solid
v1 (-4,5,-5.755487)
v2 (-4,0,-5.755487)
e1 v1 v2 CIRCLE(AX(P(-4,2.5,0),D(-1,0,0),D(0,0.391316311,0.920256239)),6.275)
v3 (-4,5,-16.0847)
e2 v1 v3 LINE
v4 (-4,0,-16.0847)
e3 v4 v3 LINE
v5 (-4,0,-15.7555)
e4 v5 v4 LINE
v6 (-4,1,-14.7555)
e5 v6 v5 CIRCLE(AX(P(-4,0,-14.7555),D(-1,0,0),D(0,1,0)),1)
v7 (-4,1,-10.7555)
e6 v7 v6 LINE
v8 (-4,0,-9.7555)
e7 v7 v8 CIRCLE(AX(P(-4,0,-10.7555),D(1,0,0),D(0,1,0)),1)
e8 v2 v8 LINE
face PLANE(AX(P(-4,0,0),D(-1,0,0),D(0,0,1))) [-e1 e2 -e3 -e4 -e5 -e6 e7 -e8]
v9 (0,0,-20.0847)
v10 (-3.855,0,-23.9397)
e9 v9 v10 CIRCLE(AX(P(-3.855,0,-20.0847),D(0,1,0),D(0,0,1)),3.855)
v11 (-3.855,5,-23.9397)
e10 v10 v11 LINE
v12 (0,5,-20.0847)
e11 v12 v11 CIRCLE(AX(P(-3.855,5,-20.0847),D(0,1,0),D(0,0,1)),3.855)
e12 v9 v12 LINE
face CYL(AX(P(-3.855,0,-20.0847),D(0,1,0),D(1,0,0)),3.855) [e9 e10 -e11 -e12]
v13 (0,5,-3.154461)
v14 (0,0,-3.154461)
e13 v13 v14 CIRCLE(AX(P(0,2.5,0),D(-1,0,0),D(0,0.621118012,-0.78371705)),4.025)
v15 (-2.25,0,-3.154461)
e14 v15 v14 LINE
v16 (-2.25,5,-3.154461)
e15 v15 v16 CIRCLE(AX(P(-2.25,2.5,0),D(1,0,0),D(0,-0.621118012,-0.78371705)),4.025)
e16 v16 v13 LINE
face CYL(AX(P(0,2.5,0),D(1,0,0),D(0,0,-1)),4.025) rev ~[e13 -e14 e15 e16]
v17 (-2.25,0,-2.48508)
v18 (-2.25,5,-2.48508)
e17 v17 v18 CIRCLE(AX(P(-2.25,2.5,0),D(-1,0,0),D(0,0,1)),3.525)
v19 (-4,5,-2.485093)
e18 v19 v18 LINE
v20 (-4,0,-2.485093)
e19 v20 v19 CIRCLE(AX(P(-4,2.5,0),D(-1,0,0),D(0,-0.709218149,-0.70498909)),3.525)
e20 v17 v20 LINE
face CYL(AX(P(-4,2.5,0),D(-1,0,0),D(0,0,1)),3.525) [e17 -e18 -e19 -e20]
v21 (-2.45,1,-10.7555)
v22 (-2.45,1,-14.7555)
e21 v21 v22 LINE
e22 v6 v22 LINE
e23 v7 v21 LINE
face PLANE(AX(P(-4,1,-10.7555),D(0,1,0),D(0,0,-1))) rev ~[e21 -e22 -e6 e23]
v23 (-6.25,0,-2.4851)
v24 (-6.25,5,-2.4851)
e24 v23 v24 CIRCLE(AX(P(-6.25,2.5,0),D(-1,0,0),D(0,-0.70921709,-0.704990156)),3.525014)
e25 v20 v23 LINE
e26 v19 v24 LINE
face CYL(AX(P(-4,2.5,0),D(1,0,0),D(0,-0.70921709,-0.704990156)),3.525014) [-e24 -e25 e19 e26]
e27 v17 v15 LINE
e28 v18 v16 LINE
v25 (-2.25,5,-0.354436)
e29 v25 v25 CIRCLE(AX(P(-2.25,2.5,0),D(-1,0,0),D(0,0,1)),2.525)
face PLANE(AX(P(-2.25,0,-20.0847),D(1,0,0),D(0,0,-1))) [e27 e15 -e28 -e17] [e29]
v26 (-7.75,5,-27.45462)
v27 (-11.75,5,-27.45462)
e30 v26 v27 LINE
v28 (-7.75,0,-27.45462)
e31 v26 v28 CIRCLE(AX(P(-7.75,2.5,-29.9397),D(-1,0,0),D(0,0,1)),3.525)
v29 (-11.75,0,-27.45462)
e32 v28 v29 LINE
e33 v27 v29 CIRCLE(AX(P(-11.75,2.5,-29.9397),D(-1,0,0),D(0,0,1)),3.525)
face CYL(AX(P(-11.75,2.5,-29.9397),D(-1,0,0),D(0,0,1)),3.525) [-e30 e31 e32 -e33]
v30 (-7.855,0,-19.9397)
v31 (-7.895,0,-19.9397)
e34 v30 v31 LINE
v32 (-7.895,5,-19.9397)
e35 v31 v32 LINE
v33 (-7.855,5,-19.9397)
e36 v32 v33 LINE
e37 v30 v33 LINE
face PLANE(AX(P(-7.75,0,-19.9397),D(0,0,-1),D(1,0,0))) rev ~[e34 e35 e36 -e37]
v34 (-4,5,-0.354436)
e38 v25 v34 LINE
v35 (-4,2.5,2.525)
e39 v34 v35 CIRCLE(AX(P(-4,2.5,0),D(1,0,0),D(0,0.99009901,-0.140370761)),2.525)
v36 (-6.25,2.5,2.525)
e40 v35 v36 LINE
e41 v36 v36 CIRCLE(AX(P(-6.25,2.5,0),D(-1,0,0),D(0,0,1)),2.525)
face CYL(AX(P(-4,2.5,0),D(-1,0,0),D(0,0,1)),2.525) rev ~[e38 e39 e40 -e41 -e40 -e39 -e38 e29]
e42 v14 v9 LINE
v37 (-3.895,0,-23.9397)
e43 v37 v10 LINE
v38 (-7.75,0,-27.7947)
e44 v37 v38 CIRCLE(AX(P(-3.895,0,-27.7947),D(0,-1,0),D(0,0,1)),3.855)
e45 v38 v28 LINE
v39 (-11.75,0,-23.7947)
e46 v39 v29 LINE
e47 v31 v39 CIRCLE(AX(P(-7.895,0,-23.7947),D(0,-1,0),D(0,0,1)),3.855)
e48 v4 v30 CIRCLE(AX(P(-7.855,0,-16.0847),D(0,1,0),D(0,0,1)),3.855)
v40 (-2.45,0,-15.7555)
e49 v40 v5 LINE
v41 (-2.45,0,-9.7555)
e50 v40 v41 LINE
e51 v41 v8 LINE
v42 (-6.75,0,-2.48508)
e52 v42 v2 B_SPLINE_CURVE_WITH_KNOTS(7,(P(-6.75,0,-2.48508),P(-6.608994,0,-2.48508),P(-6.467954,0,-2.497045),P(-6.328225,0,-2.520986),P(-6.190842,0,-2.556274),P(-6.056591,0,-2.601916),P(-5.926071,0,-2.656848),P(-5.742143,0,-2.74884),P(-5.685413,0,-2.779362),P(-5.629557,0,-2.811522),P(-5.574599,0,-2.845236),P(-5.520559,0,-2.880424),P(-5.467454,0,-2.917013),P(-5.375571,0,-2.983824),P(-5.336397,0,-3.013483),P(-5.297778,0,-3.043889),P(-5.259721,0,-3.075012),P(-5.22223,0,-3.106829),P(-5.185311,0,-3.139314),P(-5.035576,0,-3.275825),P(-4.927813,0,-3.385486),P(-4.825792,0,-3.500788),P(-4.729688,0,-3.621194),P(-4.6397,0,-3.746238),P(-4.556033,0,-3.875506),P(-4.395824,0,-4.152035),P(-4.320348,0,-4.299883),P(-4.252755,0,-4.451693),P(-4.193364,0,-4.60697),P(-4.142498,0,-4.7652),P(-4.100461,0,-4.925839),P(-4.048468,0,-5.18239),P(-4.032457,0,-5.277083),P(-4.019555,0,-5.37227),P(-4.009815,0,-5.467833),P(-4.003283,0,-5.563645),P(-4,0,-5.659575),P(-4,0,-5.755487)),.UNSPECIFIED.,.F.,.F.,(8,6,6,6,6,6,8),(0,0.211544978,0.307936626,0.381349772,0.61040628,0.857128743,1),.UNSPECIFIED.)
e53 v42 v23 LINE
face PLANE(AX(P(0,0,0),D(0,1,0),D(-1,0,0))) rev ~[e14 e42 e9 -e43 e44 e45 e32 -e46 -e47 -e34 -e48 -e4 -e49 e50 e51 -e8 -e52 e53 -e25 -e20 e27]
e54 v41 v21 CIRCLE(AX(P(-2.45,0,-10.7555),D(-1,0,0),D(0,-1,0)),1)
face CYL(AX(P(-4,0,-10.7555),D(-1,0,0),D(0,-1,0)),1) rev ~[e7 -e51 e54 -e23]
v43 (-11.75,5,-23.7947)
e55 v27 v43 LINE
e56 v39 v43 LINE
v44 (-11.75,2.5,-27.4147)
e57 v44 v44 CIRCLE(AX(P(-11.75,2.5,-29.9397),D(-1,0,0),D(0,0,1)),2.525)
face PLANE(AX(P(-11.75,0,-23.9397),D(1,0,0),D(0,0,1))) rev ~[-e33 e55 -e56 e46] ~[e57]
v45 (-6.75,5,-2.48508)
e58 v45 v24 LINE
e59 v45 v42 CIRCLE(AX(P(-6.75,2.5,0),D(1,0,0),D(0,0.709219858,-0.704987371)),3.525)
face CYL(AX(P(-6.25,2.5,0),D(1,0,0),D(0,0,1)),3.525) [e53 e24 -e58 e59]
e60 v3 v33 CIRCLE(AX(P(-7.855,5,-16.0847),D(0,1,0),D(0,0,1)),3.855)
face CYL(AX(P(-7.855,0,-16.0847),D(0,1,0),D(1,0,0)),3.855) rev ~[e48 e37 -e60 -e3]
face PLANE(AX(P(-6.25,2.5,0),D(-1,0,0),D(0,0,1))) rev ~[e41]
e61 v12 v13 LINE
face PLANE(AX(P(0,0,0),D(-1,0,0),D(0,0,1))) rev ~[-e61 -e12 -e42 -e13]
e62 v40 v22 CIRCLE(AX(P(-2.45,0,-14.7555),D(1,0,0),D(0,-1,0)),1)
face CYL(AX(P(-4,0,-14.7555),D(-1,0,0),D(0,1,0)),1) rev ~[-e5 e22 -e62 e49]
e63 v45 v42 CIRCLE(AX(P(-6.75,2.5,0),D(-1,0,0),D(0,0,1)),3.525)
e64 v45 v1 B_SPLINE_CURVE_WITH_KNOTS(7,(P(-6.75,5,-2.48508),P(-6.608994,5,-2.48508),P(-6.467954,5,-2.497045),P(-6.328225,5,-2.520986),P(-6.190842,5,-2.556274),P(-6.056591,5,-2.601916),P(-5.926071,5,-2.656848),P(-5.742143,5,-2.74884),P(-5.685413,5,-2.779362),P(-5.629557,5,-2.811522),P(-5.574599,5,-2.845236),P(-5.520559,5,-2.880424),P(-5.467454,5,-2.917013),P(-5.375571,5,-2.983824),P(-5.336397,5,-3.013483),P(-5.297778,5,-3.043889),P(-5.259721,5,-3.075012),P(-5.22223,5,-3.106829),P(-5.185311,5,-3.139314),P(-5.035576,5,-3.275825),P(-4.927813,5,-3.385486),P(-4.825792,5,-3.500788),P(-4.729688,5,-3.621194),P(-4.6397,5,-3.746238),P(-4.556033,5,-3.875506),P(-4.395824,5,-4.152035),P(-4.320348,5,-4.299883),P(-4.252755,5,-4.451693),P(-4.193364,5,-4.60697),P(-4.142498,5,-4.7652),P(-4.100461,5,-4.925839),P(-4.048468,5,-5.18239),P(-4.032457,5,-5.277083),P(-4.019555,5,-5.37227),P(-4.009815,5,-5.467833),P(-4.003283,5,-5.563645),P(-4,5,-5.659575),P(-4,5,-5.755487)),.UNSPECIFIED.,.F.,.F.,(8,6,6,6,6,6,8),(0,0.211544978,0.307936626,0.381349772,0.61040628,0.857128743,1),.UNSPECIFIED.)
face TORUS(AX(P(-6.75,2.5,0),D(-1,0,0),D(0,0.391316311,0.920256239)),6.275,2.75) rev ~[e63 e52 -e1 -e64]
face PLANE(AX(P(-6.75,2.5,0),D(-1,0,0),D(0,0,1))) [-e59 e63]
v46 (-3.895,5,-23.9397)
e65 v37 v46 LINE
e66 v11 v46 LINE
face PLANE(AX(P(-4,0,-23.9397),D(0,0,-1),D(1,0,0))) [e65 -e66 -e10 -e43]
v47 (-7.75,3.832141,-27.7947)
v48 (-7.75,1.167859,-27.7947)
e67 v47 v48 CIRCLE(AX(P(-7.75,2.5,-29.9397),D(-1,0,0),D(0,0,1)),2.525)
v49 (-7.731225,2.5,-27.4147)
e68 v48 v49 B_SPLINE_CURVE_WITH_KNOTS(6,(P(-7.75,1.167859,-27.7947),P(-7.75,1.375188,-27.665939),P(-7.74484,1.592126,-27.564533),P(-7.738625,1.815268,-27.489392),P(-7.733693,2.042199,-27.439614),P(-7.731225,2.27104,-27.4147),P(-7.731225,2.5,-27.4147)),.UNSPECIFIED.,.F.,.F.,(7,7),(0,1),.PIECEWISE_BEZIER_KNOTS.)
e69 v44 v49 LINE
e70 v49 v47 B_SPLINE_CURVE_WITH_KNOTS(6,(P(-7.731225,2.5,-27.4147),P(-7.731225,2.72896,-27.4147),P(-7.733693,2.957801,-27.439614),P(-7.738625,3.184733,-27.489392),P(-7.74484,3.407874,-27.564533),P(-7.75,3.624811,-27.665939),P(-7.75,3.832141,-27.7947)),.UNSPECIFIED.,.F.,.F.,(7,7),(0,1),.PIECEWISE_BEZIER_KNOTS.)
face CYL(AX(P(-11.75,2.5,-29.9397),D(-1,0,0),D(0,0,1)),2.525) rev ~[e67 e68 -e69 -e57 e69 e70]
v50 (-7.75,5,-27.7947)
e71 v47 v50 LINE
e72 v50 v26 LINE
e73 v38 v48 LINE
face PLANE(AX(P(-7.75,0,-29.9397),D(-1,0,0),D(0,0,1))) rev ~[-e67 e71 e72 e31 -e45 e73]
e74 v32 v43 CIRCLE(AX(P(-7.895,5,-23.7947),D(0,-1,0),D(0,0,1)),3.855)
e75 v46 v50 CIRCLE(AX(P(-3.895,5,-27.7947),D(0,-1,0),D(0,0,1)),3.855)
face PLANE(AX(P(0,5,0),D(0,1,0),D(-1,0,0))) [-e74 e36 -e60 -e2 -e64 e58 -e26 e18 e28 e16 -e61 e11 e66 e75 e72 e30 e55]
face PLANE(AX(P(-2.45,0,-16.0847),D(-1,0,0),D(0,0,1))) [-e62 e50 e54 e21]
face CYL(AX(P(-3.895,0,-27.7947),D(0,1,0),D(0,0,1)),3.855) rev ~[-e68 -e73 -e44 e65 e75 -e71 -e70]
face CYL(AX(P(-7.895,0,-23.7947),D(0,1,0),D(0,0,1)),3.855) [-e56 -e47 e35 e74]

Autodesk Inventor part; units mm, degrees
ref_plane "YZ Plane" through (0, 0, 0) normal (1, 0, 0) x (0, 1, 0)
ref_plane "XZ Plane" through (0, 0, 0) normal (0, 1, 0) x (-1, 0, 0)
ref_plane "XY Plane" through (0, 0, 0) normal (0, 0, 1) x (1, 0, 0)
sketch "Эскиз1" plane through (0, 0, 0) normal (0, 1, 0) x (-1, 0, 0)
  line L0 (0, 0) -> (4, 0)
  line L1 (4, 0) -> (4, -23.9397)
  line L2 (4, -23.9397) -> (0, -23.9397)
  line L3 (0, -23.9397) -> (0, 0)
  line L4 (0, -23.9397) -> (11.75, -23.9397)
  line L5 (11.75, -23.9397) -> (11.75, -19.9397)
  line L6 (11.75, -19.9397) -> (0, -19.9397)
  line L7 (0, -19.9397) -> (0, -23.9397)
  line L8 (11.75, -19.9397) -> (7.75, -19.9397)
  line L9 (7.75, -19.9397) -> (7.75, -29.9397)
  line L10 (7.75, -29.9397) -> (11.75, -29.9397)
  line L11 (11.75, -29.9397) -> (11.75, -19.9397)
  line L12 (11.75, -23.9397) -> (4, -19.9397)
  line L13 (0, -19.9397) -> (7.75, -23.9397)
  point P0 (3, -20.536)
  point P1 (0, -19.9397)
  dimension "d10" = 4
  dimension "d11" = 11.75
  dimension "d36" = 29.9397
  dimension "d57" = 10
extrude "Выдавливание1" add sketch "Эскиз1" along normal blind 5
fillet "Сопряжение2" radius 3.855 4 edges at (-4, 2.5, -19.9397) (-11.75, 2.5, -19.9397) (0, 2.5, -23.9397) (-7.75, 2.5, -23.9397)
sketch "Эскиз7" plane through (-11.75, 0, -29.9397) normal (-1, 0, 0) x (0, 0, 1)
  line L0 (0, 0) -> (0, 5) projected
  circle A0 centre (0, 2.5) radius 2.525
  circle A1 centre (0, 2.5) radius 3.525
  point P0 (29.9397, 0)
  point P1 (0, 4.975)
  point P2 (0, 0.025)
  dimension "d37" = 5.05
  dimension "d38" = 7.05
extrude "Выдавливание5" add sketch "Эскиз7" against normal up to surface (4 mm away) contours A0 | A1
extrude "Выдавливание8" cut sketch "Эскиз7" against normal through all contours A0
sketch "Эскиз8" plane through (-4, 0, 0) normal (-1, 0, 0) x (0, 0, 1)
  line L0 (0, 0) -> (0, 5) projected
  circle A0 centre (0, 2.5) radius 2.525
  circle A1 centre (0, 2.5) radius 3.525
  point P0 (0, 4.975)
  point P1 (0, 0.025)
  dimension "d41" = 5.05
  dimension "d42" = 7.05
extrude "Выдавливание6" add sketch "Эскиз8" against normal up to surface (4 mm away)
extrude "Выдавливание7" cut sketch "Эскиз8" against normal through all contours A0
sketch "Эскиз9" plane through (0, 0, -20.0847) normal (1, 0, 0) x (0, 0, -1)
  arc A0 (-19.7302, 5) -> (-19.7302, 0) centre (-20.0847, 2.5) ccw projected
  circle A1 centre (-20.0847, 2.5) radius 4.025
  arc A2 (-17.5996, 5) -> (-17.5996, 0) centre (-20.0847, 2.5) ccw projected
  point P0 (-20.0847, 0)
  point P1 (-20.0847, 4.975)
  point P2 (-20.0847, 0.025)
  dimension "d49" = 0.5
extrude "Выдавливание9" cut sketch "Эскиз9" against normal blind 2.25
sketch "Эскиз10" plane through (-4, 0, -16.0847) normal (-1, 0, 0) x (0, 0, 1)
  arc A0 (13.5996, 0) -> (13.5996, 5) centre (16.0847, 2.5) ccw projected
  circle A1 centre (16.0847, 2.5) radius 3.525
  circle A2 centre (16.0847, 2.5) radius 2.525 projected
  point P0 (16.0847, 0)
  point P1 (13.5996, 5)
  point P2 (13.5996, 0)
extrude "Выдавливание10" add sketch "Эскиз10" along normal blind 2.25
sketch "Эскиз11" plane through (-6.25, 2.5, 0) normal (-1, 0, 0) x (0, 0, 1)
  circle A0 centre (0, 0) radius 3.525 projected
  point P0 (0, -2.5)
extrude "Выдавливание11" add sketch "Эскиз11" along normal blind 0.5
fillet "Сопряжение6" radius 2.75 1 edges at (-4, 2.5, -3.525)
sketch "Эскиз12" plane through (-4, 0, -16.0847) normal (-1, 0, 0) x (0, 0, 1)
  line L0 (5.3292, 0) -> (1.3292, 0) construction
  line L1 (5.3292, 1) -> (1.3292, 1)
  line L2 (1.3292, -1) -> (5.3292, -1)
  arc A0 (5.3292, -1) -> (5.3292, 1) centre (5.3292, 0) ccw
  arc A1 (1.3292, 1) -> (1.3292, -1) centre (1.3292, 0) ccw
  line L3 (0, 0) -> (10.3292, 0) projected
  point P0 (16.0847, 0)
  point P1 (3.3292, 0)
  dimension "d58" = 2
  dimension "d59" = 2
  dimension "d63" = 7
extrude "Выдавливание12" cut sketch "Эскиз12" against normal blind 1.55
properties part number "Рулевая тяга"
